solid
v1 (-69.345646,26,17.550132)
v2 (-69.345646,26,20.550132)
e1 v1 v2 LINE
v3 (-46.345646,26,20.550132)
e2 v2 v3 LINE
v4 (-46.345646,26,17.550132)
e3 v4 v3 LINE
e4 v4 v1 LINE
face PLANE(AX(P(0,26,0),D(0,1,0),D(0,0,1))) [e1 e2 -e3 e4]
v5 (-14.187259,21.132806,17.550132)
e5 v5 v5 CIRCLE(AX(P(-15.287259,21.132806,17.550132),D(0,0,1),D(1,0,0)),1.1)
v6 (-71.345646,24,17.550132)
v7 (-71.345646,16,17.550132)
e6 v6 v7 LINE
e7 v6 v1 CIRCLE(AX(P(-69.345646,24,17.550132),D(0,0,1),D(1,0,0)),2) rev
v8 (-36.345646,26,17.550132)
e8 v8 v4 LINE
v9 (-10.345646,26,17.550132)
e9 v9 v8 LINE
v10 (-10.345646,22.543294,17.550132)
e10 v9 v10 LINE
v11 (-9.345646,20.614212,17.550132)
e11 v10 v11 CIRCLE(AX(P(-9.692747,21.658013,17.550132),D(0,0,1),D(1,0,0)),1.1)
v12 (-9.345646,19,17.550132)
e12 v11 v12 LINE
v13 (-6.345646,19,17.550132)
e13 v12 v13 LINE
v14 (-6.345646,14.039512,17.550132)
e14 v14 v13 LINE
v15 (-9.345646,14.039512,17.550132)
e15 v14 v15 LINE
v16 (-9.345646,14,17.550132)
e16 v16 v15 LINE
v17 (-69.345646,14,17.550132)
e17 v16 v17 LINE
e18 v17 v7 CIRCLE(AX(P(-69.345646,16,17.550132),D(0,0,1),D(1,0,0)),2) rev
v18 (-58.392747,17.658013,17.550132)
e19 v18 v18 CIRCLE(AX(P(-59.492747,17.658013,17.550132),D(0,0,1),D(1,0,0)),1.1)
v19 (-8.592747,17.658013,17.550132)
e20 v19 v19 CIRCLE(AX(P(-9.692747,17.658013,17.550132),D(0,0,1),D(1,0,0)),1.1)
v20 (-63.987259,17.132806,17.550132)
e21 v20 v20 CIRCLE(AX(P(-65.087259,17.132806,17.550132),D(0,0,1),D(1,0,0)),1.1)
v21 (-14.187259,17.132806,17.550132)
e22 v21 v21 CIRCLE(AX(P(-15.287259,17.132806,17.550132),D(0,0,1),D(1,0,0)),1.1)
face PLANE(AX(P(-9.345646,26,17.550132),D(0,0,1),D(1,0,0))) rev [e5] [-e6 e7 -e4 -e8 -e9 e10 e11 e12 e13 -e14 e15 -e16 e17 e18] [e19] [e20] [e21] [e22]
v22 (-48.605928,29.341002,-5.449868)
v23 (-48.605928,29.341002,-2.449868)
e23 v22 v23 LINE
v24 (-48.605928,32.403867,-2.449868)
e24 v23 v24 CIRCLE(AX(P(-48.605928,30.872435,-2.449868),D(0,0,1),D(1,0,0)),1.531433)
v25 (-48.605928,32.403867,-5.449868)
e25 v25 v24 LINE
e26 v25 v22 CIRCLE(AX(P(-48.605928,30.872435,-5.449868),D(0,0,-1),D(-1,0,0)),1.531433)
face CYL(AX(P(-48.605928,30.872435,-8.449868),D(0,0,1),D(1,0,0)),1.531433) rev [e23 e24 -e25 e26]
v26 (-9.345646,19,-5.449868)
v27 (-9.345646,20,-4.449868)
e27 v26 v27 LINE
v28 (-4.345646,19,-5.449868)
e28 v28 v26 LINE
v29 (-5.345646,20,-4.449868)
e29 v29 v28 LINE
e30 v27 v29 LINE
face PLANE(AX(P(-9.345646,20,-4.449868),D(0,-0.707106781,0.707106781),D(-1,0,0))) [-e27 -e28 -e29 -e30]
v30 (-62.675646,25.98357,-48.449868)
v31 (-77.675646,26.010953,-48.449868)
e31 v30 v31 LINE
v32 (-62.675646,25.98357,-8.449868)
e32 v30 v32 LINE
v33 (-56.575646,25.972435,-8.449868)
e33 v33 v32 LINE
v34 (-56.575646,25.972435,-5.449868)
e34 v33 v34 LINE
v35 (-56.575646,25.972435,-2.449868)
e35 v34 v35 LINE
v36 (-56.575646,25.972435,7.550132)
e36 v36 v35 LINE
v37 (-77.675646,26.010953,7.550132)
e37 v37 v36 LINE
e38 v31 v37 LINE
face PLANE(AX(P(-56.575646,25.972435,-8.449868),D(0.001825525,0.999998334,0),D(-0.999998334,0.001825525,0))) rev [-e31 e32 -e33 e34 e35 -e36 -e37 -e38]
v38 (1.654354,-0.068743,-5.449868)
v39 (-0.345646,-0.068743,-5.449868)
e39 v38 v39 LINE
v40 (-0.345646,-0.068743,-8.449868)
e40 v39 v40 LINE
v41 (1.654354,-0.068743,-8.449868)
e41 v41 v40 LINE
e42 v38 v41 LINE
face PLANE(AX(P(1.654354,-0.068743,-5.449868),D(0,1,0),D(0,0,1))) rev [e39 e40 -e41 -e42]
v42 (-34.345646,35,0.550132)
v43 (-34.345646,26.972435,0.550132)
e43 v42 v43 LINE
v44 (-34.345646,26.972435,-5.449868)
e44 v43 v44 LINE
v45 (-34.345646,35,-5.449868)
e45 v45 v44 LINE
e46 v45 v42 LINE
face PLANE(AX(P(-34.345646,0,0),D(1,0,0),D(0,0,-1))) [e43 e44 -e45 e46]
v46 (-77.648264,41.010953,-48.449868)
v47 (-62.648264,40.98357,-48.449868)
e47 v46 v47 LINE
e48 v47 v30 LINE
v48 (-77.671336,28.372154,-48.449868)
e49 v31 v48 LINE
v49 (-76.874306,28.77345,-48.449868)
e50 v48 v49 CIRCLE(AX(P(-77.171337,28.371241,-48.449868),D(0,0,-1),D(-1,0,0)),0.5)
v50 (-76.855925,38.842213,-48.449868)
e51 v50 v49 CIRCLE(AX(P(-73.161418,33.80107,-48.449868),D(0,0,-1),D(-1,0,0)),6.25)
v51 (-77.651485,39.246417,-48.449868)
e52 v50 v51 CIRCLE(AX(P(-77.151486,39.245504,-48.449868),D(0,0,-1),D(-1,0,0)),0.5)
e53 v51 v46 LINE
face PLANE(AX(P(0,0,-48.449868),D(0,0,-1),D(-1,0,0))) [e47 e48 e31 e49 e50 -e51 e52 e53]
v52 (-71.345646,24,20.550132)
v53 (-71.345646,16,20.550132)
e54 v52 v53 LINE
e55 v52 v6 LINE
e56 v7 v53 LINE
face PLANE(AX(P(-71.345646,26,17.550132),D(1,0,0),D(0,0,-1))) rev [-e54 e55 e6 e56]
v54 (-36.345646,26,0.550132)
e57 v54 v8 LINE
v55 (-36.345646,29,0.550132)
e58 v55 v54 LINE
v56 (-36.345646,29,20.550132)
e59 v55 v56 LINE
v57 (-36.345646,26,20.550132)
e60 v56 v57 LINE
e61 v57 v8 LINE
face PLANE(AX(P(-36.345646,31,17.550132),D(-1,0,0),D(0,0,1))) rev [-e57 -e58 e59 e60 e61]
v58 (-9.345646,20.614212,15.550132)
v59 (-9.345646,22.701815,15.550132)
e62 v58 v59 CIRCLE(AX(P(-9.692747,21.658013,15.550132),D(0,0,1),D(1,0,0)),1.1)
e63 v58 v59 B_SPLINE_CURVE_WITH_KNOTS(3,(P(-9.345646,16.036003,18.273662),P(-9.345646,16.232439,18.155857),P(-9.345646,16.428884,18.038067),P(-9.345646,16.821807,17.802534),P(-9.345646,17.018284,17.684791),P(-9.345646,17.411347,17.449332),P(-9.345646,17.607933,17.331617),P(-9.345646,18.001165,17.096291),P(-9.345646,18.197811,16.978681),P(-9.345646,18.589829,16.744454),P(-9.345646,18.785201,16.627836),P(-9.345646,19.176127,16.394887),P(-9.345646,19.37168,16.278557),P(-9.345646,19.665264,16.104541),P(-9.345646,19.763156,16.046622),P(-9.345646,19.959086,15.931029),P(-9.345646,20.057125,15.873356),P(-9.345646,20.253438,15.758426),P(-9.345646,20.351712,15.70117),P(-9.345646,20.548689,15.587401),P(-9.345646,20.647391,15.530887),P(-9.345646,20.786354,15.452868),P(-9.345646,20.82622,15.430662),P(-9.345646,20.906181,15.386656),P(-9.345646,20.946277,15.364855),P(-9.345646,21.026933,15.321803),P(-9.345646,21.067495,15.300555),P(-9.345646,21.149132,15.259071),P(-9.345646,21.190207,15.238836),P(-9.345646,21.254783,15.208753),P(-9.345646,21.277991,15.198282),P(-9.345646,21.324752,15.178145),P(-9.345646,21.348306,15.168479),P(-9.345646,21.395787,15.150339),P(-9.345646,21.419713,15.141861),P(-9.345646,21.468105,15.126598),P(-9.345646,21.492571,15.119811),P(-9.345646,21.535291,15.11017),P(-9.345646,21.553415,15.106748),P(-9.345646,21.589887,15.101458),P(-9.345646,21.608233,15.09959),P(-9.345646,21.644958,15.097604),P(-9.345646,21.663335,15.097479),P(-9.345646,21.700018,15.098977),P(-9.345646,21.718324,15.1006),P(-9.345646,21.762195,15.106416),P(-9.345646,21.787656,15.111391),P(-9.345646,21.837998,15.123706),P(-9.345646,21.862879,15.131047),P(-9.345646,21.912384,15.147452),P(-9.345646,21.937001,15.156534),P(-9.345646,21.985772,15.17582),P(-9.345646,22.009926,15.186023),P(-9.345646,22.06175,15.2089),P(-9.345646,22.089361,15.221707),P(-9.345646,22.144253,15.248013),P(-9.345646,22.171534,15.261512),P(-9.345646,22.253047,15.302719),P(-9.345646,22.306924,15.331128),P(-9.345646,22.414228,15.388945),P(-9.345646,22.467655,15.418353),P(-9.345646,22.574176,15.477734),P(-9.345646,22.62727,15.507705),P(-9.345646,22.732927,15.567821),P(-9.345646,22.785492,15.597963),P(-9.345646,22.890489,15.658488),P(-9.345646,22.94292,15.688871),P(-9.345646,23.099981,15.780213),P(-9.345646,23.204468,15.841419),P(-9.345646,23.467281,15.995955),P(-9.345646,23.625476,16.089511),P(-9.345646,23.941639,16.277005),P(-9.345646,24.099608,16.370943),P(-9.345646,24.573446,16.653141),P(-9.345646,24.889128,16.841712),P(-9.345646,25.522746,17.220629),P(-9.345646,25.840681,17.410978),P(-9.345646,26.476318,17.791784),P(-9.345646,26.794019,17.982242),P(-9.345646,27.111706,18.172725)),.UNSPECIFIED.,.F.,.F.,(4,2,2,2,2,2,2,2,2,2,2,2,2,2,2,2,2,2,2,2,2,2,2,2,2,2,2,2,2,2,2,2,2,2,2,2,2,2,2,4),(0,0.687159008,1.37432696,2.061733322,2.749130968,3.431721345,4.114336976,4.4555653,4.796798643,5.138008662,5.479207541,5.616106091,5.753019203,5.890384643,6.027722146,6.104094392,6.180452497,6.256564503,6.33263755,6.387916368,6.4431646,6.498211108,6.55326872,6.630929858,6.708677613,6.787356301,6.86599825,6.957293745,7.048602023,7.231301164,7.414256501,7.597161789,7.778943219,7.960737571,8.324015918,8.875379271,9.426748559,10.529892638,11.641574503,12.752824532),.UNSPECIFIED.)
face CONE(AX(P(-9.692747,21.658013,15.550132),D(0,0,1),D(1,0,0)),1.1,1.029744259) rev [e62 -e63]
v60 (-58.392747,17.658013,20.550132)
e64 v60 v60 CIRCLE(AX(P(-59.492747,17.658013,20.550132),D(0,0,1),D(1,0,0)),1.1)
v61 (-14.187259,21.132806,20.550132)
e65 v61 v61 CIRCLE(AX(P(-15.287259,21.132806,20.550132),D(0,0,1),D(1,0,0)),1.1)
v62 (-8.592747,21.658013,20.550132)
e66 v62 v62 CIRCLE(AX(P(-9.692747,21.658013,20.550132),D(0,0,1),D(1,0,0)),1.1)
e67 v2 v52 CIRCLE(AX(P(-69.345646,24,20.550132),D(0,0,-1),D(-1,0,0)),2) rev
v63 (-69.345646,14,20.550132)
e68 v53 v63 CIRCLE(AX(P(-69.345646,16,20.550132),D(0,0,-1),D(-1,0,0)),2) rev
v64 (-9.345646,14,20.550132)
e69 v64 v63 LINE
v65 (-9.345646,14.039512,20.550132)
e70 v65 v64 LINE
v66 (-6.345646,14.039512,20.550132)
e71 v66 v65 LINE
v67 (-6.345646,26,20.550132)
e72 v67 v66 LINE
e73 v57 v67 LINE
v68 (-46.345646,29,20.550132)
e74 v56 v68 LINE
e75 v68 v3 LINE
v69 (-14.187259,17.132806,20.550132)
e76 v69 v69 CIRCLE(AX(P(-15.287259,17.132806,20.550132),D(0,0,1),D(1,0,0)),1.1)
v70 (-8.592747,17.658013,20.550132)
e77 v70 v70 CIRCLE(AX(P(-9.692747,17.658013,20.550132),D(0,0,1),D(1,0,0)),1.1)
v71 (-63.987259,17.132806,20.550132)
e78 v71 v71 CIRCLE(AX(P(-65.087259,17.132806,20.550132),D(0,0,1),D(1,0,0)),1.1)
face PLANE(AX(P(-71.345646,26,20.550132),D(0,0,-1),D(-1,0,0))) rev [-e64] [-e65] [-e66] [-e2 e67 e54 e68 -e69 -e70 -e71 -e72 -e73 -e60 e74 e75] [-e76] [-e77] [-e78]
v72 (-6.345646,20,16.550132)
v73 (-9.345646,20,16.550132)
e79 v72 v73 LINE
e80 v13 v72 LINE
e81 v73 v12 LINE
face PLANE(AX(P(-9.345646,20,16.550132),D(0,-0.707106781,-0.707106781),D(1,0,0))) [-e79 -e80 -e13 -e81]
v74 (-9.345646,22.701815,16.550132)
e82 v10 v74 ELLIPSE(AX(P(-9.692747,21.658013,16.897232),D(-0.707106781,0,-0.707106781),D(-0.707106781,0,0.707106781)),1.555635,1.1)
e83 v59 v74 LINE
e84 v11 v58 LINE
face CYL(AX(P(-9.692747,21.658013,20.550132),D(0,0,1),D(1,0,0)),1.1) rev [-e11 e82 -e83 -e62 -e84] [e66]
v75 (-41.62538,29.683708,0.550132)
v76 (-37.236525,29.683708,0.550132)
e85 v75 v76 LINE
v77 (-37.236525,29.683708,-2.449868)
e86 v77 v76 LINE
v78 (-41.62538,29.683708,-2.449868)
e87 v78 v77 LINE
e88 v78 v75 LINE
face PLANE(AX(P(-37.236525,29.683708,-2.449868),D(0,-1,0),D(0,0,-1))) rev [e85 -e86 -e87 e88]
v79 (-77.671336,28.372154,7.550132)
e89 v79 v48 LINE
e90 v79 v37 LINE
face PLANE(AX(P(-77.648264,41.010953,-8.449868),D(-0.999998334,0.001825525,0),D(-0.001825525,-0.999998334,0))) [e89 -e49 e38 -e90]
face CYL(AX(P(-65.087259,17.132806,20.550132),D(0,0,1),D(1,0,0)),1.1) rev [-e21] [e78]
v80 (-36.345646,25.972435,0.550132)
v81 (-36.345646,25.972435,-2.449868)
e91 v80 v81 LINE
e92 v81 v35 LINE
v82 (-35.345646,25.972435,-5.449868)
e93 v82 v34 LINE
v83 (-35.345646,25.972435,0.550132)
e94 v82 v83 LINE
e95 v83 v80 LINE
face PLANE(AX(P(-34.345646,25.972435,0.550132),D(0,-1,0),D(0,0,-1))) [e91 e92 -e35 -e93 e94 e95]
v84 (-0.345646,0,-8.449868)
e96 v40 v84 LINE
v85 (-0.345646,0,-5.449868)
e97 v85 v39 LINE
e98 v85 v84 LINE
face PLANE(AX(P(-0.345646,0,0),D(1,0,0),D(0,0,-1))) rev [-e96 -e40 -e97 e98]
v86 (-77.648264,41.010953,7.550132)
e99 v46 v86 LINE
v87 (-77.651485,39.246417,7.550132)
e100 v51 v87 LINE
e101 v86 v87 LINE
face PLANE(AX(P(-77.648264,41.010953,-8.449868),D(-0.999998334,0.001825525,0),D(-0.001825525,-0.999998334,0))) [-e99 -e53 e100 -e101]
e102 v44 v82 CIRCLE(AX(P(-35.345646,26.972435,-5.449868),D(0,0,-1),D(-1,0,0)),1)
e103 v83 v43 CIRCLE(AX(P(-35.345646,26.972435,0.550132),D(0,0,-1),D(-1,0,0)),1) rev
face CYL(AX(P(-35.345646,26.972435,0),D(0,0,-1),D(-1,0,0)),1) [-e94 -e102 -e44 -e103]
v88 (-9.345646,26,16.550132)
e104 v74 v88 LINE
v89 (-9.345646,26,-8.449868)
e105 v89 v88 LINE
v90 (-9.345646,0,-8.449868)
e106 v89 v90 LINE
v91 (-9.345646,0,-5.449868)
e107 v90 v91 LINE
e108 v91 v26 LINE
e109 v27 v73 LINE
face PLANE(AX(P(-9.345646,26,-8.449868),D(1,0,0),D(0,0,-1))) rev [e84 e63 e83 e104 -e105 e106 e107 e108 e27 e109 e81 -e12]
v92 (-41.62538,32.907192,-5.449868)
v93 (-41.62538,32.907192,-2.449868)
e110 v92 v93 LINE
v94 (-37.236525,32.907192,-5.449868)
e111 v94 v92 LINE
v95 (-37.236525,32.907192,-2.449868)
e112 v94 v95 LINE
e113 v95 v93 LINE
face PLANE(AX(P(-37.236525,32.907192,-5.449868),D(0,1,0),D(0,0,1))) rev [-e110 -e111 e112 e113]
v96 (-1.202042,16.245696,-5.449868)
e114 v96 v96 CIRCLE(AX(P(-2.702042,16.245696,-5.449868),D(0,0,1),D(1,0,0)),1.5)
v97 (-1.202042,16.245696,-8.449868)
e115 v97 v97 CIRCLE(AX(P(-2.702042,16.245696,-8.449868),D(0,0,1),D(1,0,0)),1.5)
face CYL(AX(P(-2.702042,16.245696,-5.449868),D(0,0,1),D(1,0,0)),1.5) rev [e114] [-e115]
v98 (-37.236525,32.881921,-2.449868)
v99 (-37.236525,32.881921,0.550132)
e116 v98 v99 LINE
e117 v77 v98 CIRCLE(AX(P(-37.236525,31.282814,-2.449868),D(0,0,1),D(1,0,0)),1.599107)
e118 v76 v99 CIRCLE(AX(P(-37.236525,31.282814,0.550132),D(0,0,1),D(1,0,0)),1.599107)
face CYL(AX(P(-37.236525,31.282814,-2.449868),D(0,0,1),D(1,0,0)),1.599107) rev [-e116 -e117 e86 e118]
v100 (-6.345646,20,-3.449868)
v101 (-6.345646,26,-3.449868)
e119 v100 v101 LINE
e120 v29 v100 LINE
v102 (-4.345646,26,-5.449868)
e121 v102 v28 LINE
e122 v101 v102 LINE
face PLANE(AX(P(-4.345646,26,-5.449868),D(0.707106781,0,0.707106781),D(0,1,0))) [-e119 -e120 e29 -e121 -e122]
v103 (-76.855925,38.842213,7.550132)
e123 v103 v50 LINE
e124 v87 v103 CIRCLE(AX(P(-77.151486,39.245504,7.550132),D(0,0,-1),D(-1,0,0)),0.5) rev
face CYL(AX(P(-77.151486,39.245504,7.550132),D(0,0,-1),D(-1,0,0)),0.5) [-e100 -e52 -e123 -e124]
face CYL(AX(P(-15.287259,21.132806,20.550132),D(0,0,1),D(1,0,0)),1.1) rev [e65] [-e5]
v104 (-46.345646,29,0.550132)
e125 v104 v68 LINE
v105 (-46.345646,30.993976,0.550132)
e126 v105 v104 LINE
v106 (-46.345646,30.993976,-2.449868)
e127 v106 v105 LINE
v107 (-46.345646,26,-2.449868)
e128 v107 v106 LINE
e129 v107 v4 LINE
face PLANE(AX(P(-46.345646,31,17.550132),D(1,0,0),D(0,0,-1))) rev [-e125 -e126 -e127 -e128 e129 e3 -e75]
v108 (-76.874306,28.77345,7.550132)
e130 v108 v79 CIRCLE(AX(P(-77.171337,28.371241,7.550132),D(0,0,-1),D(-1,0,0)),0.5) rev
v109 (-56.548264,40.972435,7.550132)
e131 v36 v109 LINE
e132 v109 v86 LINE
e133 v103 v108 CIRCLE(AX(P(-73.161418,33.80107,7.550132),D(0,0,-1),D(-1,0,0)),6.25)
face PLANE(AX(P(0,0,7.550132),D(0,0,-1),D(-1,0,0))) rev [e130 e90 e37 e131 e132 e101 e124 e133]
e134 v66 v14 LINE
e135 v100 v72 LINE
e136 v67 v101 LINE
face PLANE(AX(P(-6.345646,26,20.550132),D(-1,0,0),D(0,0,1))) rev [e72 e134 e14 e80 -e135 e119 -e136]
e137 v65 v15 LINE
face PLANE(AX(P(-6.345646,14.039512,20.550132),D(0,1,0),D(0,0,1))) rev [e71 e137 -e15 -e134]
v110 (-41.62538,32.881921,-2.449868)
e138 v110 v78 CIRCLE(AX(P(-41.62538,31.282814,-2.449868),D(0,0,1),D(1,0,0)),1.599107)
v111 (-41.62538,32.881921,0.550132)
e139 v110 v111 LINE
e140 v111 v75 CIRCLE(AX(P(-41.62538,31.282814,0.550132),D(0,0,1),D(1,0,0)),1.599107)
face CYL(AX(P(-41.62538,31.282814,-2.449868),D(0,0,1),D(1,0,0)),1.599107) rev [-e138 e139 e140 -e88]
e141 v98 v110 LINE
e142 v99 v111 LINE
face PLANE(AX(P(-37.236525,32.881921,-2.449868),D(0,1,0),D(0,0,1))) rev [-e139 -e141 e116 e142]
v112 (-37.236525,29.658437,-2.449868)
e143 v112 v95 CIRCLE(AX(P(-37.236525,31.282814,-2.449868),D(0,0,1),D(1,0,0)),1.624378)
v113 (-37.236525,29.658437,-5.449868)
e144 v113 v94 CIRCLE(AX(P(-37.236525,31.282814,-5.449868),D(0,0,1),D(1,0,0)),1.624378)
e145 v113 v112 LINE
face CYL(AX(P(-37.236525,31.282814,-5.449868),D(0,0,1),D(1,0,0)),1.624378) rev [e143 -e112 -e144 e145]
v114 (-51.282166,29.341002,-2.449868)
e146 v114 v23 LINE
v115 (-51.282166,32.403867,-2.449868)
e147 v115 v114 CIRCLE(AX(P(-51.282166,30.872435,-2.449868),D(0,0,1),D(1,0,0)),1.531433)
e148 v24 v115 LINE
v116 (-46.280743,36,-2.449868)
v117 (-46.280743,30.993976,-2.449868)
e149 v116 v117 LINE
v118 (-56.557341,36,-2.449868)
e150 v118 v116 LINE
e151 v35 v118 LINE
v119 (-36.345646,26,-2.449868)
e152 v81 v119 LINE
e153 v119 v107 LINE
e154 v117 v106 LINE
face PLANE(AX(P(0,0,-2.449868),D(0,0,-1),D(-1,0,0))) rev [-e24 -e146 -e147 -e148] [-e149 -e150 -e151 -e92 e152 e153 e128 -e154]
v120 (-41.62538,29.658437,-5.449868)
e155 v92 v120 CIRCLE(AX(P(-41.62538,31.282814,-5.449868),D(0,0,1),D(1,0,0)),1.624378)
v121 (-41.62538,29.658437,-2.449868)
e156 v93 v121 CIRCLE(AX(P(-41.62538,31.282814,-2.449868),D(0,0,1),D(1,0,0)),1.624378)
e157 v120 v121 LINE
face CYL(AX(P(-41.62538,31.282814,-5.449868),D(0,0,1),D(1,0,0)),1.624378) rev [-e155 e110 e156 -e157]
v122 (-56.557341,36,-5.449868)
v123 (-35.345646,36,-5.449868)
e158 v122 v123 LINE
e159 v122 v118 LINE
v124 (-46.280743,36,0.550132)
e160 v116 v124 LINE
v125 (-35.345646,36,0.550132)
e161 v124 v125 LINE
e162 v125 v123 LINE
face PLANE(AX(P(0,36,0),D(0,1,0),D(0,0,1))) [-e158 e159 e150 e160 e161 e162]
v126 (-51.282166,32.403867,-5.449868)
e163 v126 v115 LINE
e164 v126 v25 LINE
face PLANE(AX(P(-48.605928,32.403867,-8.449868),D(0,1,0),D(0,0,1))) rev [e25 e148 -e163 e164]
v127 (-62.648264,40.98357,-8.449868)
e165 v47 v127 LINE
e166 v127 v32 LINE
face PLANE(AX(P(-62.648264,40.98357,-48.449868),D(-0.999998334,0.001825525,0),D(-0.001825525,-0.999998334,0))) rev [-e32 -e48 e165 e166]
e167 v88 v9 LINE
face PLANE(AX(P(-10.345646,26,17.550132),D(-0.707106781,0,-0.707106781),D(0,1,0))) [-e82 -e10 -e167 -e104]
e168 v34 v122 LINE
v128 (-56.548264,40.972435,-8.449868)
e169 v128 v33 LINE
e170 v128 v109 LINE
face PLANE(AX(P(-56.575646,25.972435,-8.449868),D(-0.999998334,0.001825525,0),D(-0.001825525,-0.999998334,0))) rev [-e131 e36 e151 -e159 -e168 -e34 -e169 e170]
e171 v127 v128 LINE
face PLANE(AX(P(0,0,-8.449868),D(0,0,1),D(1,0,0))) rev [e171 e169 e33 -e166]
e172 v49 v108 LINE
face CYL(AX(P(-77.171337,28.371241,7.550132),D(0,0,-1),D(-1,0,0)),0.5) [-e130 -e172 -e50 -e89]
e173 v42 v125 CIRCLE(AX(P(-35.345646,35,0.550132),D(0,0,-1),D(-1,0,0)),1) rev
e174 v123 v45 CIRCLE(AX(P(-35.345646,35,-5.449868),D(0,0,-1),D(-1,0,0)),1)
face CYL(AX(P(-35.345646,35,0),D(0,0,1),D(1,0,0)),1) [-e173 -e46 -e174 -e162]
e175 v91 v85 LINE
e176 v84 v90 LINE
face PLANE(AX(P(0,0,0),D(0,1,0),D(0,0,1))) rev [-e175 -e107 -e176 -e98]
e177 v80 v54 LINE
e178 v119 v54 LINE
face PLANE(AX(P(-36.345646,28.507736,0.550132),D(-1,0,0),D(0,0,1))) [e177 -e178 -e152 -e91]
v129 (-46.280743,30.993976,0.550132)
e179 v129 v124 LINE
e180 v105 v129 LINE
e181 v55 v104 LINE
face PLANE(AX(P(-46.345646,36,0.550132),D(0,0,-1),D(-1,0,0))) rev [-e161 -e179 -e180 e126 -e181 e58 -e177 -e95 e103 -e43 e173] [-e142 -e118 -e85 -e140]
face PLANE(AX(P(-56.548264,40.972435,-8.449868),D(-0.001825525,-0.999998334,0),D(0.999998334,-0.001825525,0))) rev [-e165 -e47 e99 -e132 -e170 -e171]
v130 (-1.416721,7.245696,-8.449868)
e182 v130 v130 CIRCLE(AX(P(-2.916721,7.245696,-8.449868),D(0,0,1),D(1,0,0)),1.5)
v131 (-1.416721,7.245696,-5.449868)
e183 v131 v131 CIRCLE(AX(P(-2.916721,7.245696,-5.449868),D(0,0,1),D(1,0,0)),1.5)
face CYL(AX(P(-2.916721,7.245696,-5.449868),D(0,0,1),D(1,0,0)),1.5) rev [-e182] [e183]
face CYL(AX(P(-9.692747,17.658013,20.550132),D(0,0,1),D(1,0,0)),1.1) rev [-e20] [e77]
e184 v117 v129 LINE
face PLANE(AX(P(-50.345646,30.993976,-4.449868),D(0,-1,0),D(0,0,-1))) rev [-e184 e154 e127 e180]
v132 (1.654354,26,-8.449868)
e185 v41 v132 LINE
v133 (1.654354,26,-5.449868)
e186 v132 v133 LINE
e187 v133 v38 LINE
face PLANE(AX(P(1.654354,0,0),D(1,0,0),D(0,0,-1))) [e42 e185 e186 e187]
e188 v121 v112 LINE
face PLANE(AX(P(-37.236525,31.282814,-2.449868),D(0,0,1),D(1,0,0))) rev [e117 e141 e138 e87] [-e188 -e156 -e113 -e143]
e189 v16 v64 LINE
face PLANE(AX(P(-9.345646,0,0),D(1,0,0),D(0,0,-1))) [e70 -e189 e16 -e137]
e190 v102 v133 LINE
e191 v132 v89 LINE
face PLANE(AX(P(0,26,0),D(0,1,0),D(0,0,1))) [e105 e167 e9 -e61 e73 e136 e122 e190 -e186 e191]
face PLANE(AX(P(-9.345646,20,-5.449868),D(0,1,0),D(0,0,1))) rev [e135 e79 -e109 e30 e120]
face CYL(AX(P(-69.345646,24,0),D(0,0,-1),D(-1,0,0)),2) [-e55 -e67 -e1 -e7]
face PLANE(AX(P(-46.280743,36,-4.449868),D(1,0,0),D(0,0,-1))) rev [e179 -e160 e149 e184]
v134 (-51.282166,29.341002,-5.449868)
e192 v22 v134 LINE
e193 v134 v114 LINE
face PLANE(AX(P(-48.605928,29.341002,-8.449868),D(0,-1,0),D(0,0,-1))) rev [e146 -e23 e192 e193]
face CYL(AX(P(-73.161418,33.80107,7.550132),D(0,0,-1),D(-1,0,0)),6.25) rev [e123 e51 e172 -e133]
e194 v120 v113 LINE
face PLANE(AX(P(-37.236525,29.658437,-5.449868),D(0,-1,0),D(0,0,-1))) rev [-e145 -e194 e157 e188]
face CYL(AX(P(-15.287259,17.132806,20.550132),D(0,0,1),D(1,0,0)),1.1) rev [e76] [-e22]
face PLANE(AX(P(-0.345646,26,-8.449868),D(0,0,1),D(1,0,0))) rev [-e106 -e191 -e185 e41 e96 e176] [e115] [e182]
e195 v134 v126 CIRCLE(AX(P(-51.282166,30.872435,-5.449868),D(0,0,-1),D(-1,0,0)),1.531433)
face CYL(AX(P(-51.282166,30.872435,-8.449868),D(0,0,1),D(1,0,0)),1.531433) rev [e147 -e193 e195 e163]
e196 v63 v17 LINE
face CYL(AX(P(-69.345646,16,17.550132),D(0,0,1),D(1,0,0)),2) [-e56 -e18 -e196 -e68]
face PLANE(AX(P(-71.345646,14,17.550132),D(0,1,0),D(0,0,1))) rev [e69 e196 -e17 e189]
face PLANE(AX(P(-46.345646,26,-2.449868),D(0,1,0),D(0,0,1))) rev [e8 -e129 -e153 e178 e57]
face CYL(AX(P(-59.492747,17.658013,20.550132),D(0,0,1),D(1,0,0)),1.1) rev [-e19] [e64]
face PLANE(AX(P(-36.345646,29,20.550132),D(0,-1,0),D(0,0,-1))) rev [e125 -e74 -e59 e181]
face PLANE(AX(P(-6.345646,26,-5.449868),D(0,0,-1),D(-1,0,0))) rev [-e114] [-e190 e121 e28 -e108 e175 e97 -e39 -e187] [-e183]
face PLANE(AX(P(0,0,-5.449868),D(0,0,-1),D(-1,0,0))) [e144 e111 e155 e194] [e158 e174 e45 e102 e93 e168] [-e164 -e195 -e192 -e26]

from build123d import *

# Parameters (mm, degrees)
EXTRUDE_1_DEPTH                 = 26
HOLE_START                      = -8.449868074
HOLE_WIZARD_3_0_3_1_OUTLINE_R   = 1.5
HOLE_WIZARD_3_0_3_1_DEPTH       = 3
SKETCH_11_W                     = 26
SKETCH_11_H                     = 20
CUT_EXTRUDE_1_DEPTH             = 3
SKETCH_14_W                     = 62
SKETCH_14_H                     = 14
CUT_EXTRUDE_2_DEPTH             = 3
SKETCH_18_W                     = 3
SKETCH_18_H                     = 5.960488001
EXTRUDE_5_DEPTH                 = 3
HOLE_START_2                    = 17.550131926
HOLE_WIZARD_3_0_2_2_1_OUTLINE_R = 1.1
HOLE_WIZARD_3_0_2_2_1_DEPTH     = 3
HOLE_WIZARD_3_0_2_2_2_OUTLINE_R = 1.1
HOLE_WIZARD_3_0_2_2_2_DEPTH     = 3
HOLE_WIZARD_3_0_2_2_3_OUTLINE_R = 1.1
HOLE_WIZARD_3_0_2_2_3_DEPTH     = 3
HOLE_WIZARD_3_0_2_2_4_OUTLINE_R = 1.1
HOLE_WIZARD_3_0_2_2_4_DEPTH     = 3
CHAMFER_1_SIZE                  = 1
CHAMFER_2_SIZE                  = 2
CHAMFER_3_SIZE                  = 1
SKETCH_45_W                     = 3
SKETCH_45_H                     = 26.068743285
EXTRUDE_6_DEPTH                 = 2
CHAMFER_4_SIZE                  = 1
SKETCH_64_W                     = 5
SKETCH_64_H                     = 3
EXTRUDE_11_DEPTH                = 5
SKETCH_65_W                     = 5
SKETCH_65_H                     = 4.928929729
EXTRUDE_12_DEPTH                = 20
SKETCH_68_W                     = 5
SKETCH_68_H                     = 3
EXTRUDE_13_DEPTH                = 5
SKETCH_70_W                     = 3
SKETCH_70_H                     = 5.006023724
EXTRUDE_14_DEPTH                = 4
SKETCH_71_W                     = 3
SKETCH_71_H                     = 4.998374441
EXTRUDE_15_DEPTH                = 3
SKETCH_73_W                     = 20
SKETCH_73_H                     = 2.154918848
CUT_EXTRUDE_5_DEPTH             = 5
FILLET_1_R                      = 2
EXTRUDE_START                   = -3
SKETCH_80_R                     = 1.5
EXTRUDE_16_DEPTH                = 3
HOLE_WIZARD_3_0_3_2_OUTLINE_R   = 1.5
HOLE_WIZARD_3_0_3_2_DEPTH       = 3
SKETCH_88_W                     = 5
SKETCH_88_H                     = 3
EXTRUDE_20_DEPTH                = 5
SKETCH_89_W                     = 5
SKETCH_89_H                     = 2.54765363
EXTRUDE_21_DEPTH                = 20
SKETCH_92_W                     = 2.009733892
SKETCH_92_H                     = 3
EXTRUDE_22_DEPTH                = 5
SKETCH_93_W                     = 4.064903442
SKETCH_93_H                     = 5.006023724
CUT_EXTRUDE_6_DEPTH             = 5
SKETCH_94_W                     = 3
SKETCH_94_H                     = 7.492263756
EXTRUDE_23_DEPTH                = 2
EXTRUDE_24_DEPTH                = 20
SKETCH_101_W                    = 2
SKETCH_101_H                    = 2.53530172
EXTRUDE_25_DEPTH                = 3
SKETCH_102_W                    = 20
SKETCH_102_H                    = 2
CUT_EXTRUDE_8_DEPTH             = 10
CUT_EXTRUDE_9_DEPTH             = 3
SKETCH_112_W                    = 22.23
SKETCH_112_H                    = 10.027565476
EXTRUDE_26_DEPTH                = 3
CUT_EXTRUDE_10_DEPTH            = 3
HOLE_WIZARD_3_0_3_3_D           = 3
HOLE_WIZARD_3_0_3_3_DEPTH       = 5
HOLE_WIZARD_3_0_3_3_TIP         = 0.901290929
EXTRUDE_27_DEPTH                = 3
FILLET_2_R                      = 1
CUT_EXTRUDE_13_DEPTH            = 6
EXTRUDE_28_DEPTH                = 6
EXTRUDE_29_DEPTH                = 40
EXTRUDE_30_DEPTH                = 10
SKETCH_126_R                    = 6.25
CUT_EXTRUDE_14_DEPTH            = 56
FILLET_3_R                      = 0.5
FILLET_4_R                      = 0.5


# Read off the part's stored shape, not the designer's step: Ø3.0 (3) 直径孔1, Ø3.0 (2.2) 直径孔1, Ø3.0 (2.2) 直径孔2, Ø3.0 (2.2) 直径孔3, Ø3.0 (2.2) 直径孔4, Ø3.0 (3) 直径孔2
with BuildPart() as part:
    # 草图4 → 凸台-拉伸1 (new body)
    with BuildSketch(Plane(origin=(0, 0, 0), x_dir=(1, 0, 0), z_dir=(0, 1, 0))):
        Polygon((-71.345646438, -20.550131926), (-6.345646438, -20.550131926), (-6.345646438, 5.449868074), (-0.345646438, 5.449868074), (-0.345646438, 8.449868074), (-9.345646438, 8.449868074), (-9.345646438, -17.550131926), (-71.345646438, -17.550131926), align=None)
    extrude(amount=EXTRUDE_1_DEPTH)

    # Ø3.0 (3) 直径孔1 outline → Ø3.0 (3) 直径孔1 (cut)
    with BuildSketch(Plane.XY.offset(HOLE_START)):
        with Locations((-2.70204226, 8.045696334)):
            Circle(HOLE_WIZARD_3_0_3_1_OUTLINE_R)
        with Locations((-2.70204226, 16.245696334)):
            Circle(HOLE_WIZARD_3_0_3_1_OUTLINE_R)
    extrude(amount=HOLE_WIZARD_3_0_3_1_DEPTH, mode=Mode.SUBTRACT)

    # 草图11 → 切除-拉伸1 (cut)
    with BuildSketch(Plane(origin=(-6.345646438, 0, 0), x_dir=(0, 0, -1), z_dir=(1, 0, 0))):
        with Locations((-7.550131926, 10)):
            Rectangle(SKETCH_11_W, SKETCH_11_H)
    extrude(amount=-CUT_EXTRUDE_1_DEPTH, mode=Mode.SUBTRACT)

    # 草图14 → 切除-拉伸2 (cut)
    with BuildSketch(Plane.XY.offset(20.550131926)):
        with Locations((-40.345646438, 7)):
            Rectangle(SKETCH_14_W, SKETCH_14_H)
    extrude(amount=-CUT_EXTRUDE_2_DEPTH, mode=Mode.SUBTRACT)

    # 草图18 → 凸台-拉伸5 (add)
    with BuildSketch(Plane(origin=(-9.345646438, 0, 0), x_dir=(0, 0, -1), z_dir=(1, 0, 0))):
        with Locations((-19.050131926, 17.019755999)):
            Rectangle(SKETCH_18_W, SKETCH_18_H)
    extrude(amount=EXTRUDE_5_DEPTH)

    # Ø3.0 (2.2) 直径孔1 outline → Ø3.0 (2.2) 直径孔1 (cut)
    with BuildSketch(Plane.XY.offset(HOLE_START_2)):
        with Locations((-9.692746544, 17.658013179)):
            Circle(HOLE_WIZARD_3_0_2_2_1_OUTLINE_R)
    extrude(amount=HOLE_WIZARD_3_0_2_2_1_DEPTH, mode=Mode.SUBTRACT)

    # Hole Wizard 3.0 _2.2_ _1 2 outline → Hole Wizard 3.0 _2.2_ _1 2 (revolve, cut)
    with BuildSketch(Plane(origin=(-9.692746544, 21.658013179, 0), x_dir=(1, 0, 0), z_dir=(0, -1, 0))):
        Polygon((0.346891917, 15.097618937), (1.100000001, 15.550131926), (1.1, 20.550131926), (0, 20.550131926), (0, 15.097618937), align=None)
    revolve(axis=Axis((-9.692746544, 21.658013179, 0), (0, 0, 1)), mode=Mode.SUBTRACT)

    # Ø3.0 (2.2) 直径孔2 outline → Ø3.0 (2.2) 直径孔2 (cut)
    with BuildSketch(Plane.XY.offset(HOLE_START_2)):
        with Locations((-59.492746544, 17.658013179)):
            Circle(HOLE_WIZARD_3_0_2_2_2_OUTLINE_R)
    extrude(amount=HOLE_WIZARD_3_0_2_2_2_DEPTH, mode=Mode.SUBTRACT)

    # Ø3.0 (2.2) 直径孔3 outline → Ø3.0 (2.2) 直径孔3 (cut)
    with BuildSketch(Plane.XY.offset(HOLE_START_2)):
        with Locations((-15.287259423, 17.132806202)):
            Circle(HOLE_WIZARD_3_0_2_2_3_OUTLINE_R)
        with Locations((-15.287259423, 21.132806202)):
            Circle(HOLE_WIZARD_3_0_2_2_3_OUTLINE_R)
    extrude(amount=HOLE_WIZARD_3_0_2_2_3_DEPTH, mode=Mode.SUBTRACT)

    # Ø3.0 (2.2) 直径孔4 outline → Ø3.0 (2.2) 直径孔4 (cut)
    with BuildSketch(Plane.XY.offset(HOLE_START_2)):
        with Locations((-65.087259423, 17.132806202)):
            Circle(HOLE_WIZARD_3_0_2_2_4_OUTLINE_R)
    extrude(amount=HOLE_WIZARD_3_0_2_2_4_DEPTH, mode=Mode.SUBTRACT)

    # 倒角1
    chamfer_1_edges = [part.edges().sort_by_distance(p)[0] for p in [
        (-9.345646438, 24.350907327, 17.550131926),
    ]]
    chamfer(chamfer_1_edges, length=CHAMFER_1_SIZE)

    # 倒角2
    chamfer_2_edges = [part.edges().sort_by_distance(p)[0] for p in [
        (-6.345646438, 23, -5.449868074),
    ]]
    chamfer(chamfer_2_edges, length=CHAMFER_2_SIZE)

    # 倒角3
    chamfer_3_edges = [part.edges().sort_by_distance(p)[0] for p in [
        (-7.845646438, 20, 17.550131926),
    ]]
    chamfer(chamfer_3_edges, length=CHAMFER_3_SIZE)

    # 草图45 → 凸台-拉伸6 (add)
    with BuildSketch(Plane(origin=(-0.345646438, 0, 0), x_dir=(0, 0, -1), z_dir=(1, 0, 0))):
        with Locations((6.949868074, 12.965628357)):
            Rectangle(SKETCH_45_W, SKETCH_45_H)
    extrude(amount=EXTRUDE_6_DEPTH)

    # 倒角4
    chamfer_4_edges = [part.edges().sort_by_distance(p)[0] for p in [
        (-6.845646438, 20, -5.449868074),
    ]]
    chamfer(chamfer_4_edges, length=CHAMFER_4_SIZE)

    # 草图64 → 凸台-拉伸11 (add)
    with BuildSketch(Plane(origin=(0, 26, 0), x_dir=(1, 0, 0), z_dir=(0, 1, 0))):
        with Locations((-43.845646438, -19.050131926)):
            Rectangle(SKETCH_64_W, SKETCH_64_H)
    extrude(amount=EXTRUDE_11_DEPTH)

    # 草图65 → 凸台-拉伸12 (add)
    with BuildSketch(Plane(origin=(0, 0, 17.550131926), x_dir=(-1, 0, 0), z_dir=(0, 0, -1))):
        with Locations((43.845646438, 28.535535136)):
            Rectangle(SKETCH_65_W, SKETCH_65_H)
    extrude(amount=EXTRUDE_12_DEPTH)

    # 草图68 → 凸台-拉伸13 (add)
    with BuildSketch(Plane(origin=(0, 31, 0), x_dir=(1, 0, 0), z_dir=(0, 1, 0))):
        with Locations((-43.845646438, 0.949868074)):
            Rectangle(SKETCH_68_W, SKETCH_68_H)
    extrude(amount=EXTRUDE_13_DEPTH)

    # 草图70 → 凸台-拉伸14 (add)
    with BuildSketch(Plane.ZY.offset(46.345646438)):
        with Locations((-0.949868074, 33.496988138)):
            Rectangle(SKETCH_70_W, SKETCH_70_H)
    extrude(amount=EXTRUDE_14_DEPTH)

    # 草图71 → 凸台-拉伸15 (add)
    with BuildSketch(Plane(origin=(-41.345646438, 0, 0), x_dir=(0, 0, -1), z_dir=(1, 0, 0))):
        with Locations((0.949868074, 33.50081278)):
            Rectangle(SKETCH_71_W, SKETCH_71_H)
    extrude(amount=EXTRUDE_15_DEPTH)

    # 草图73 → 切除-拉伸5 (cut)
    with BuildSketch(Plane.ZY.offset(46.345646438)):
        with Locations((7.550131926, 27.148529695)):
            Rectangle(SKETCH_73_W, SKETCH_73_H)
    extrude(amount=-CUT_EXTRUDE_5_DEPTH, mode=Mode.SUBTRACT)

    # 圆角1
    fillet_1_edges = [part.edges().sort_by_distance(p)[0] for p in [
        (-71.345646438, 26, 19.050131926),
        (-71.345646438, 14, 19.050131926),
    ]]
    fillet(fillet_1_edges, radius=FILLET_1_R)

    # 草图80 → 凸台-拉伸16 (add)
    with BuildSketch(Plane.XY.offset(-5.449868074).offset(EXTRUDE_START)):
        with Locations((-2.70204226, 8.045696334)):
            Circle(SKETCH_80_R)
    extrude(amount=EXTRUDE_16_DEPTH)

    # Ø3.0 (3) 直径孔2 outline → Ø3.0 (3) 直径孔2 (cut)
    with BuildSketch(Plane.XY.offset(HOLE_START)):
        with Locations((-2.916721347, 7.245696334)):
            Circle(HOLE_WIZARD_3_0_3_2_OUTLINE_R)
    extrude(amount=HOLE_WIZARD_3_0_3_2_DEPTH, mode=Mode.SUBTRACT)

    # 草图88 → 凸台-拉伸20 (add)
    with BuildSketch(Plane(origin=(0, 26, 0), x_dir=(1, 0, 0), z_dir=(0, 1, 0))):
        with Locations((-38.845646438, -19.050131926)):
            Rectangle(SKETCH_88_W, SKETCH_88_H)
    extrude(amount=EXTRUDE_20_DEPTH)

    # 草图89 → 凸台-拉伸21 (add)
    with BuildSketch(Plane(origin=(0, 0, 17.550131926), x_dir=(-1, 0, 0), z_dir=(0, 0, -1))):
        with Locations((38.845646438, 29.726173185)):
            Rectangle(SKETCH_89_W, SKETCH_89_H)
    extrude(amount=EXTRUDE_21_DEPTH)

    # 草图92 → 凸台-拉伸22 (add)
    with BuildSketch(Plane(origin=(0, 31, 0), x_dir=(1, 0, 0), z_dir=(0, 1, 0))):
        with Locations((-37.350513384, 0.949868074)):
            Rectangle(SKETCH_92_W, SKETCH_92_H)
    extrude(amount=EXTRUDE_22_DEPTH)

    # 草图93 → 切除-拉伸6 (cut)
    with BuildSketch(Plane.XY.offset(0.550131926)):
        with Locations((-48.313194717, 33.496988138)):
            Rectangle(SKETCH_93_W, SKETCH_93_H)
    extrude(amount=-CUT_EXTRUDE_6_DEPTH, mode=Mode.SUBTRACT)

    # 草图94 → 凸台-拉伸23 (add)
    with BuildSketch(Plane(origin=(-36.345646438, 0, 0), x_dir=(0, 0, -1), z_dir=(1, 0, 0))):
        with Locations((0.949868074, 32.253868122)):
            Rectangle(SKETCH_94_W, SKETCH_94_H)
    extrude(amount=EXTRUDE_23_DEPTH)

    # 草图100 → 凸台-拉伸24 (add)
    with BuildSketch(Plane(origin=(0, 0, 17.550131926), x_dir=(-1, 0, 0), z_dir=(0, 0, -1))):
        Polygon((36.345646438, 28.45234637), (41.345646438, 28.45234637), (41.345646438, 28.225989119), (46.345646438, 28.225989119), (46.345646438, 26), (36.345646438, 26), align=None)
    extrude(amount=EXTRUDE_24_DEPTH)

    # 草图101 → 凸台-拉伸25 (add)
    with BuildSketch(Plane(origin=(0, 0, -2.449868074), x_dir=(-1, 0, 0), z_dir=(0, 0, -1))):
        with Locations((35.345646438, 27.240085384)):
            Rectangle(SKETCH_101_W, SKETCH_101_H)
    extrude(amount=-EXTRUDE_25_DEPTH)

    # 草图102 → 切除-拉伸8 (cut)
    with BuildSketch(Plane.ZY.offset(46.345646438)):
        with Locations((10.550131926, 30)):
            Rectangle(SKETCH_102_W, SKETCH_102_H)
    extrude(amount=-CUT_EXTRUDE_8_DEPTH, mode=Mode.SUBTRACT)

    # 草图109 → 切除-拉伸9 (cut)
    with BuildSketch(Plane.XY.offset(0.550131926)):
        with BuildLine():
            Line((-37.236525371, 29.683707729), (-41.625380126, 29.683707729))
            ThreePointArc((-41.625380126, 29.683707729), (-43.224486744, 31.282814348), (-41.625380126, 32.881920967))
            Line((-41.625380126, 32.881920967), (-37.236525371, 32.881920967))
            ThreePointArc((-37.236525371, 32.881920967), (-35.637418752, 31.282814348), (-37.236525371, 29.683707729))
        make_face()
    extrude(amount=-CUT_EXTRUDE_9_DEPTH, mode=Mode.SUBTRACT)

    # 草图112 → 凸台-拉伸26 (add)
    with BuildSketch(Plane(origin=(0, 0, -2.449868074), x_dir=(-1, 0, 0), z_dir=(0, 0, -1))):
        with Locations((45.460646438, 30.986217262)):
            Rectangle(SKETCH_112_W, SKETCH_112_H)
    extrude(amount=EXTRUDE_26_DEPTH)

    # 草图113 → 切除-拉伸10 (cut)
    with BuildSketch(Plane.XY.offset(-2.449868074)):
        with BuildLine():
            Line((-37.236525371, 29.658436642), (-41.625380126, 29.658436642))
            ThreePointArc((-41.625380126, 29.658436642), (-43.249757832, 31.282814348), (-41.625380126, 32.907192054))
            Line((-41.625380126, 32.907192054), (-37.236525371, 32.907192054))
            ThreePointArc((-37.236525371, 32.907192054), (-35.612147664, 31.282814348), (-37.236525371, 29.658436642))
        make_face()
    extrude(amount=-CUT_EXTRUDE_10_DEPTH, mode=Mode.SUBTRACT)

    # Ø3.0 (3) 直径孔3
    with Locations(Plane(origin=(0, 0, -5.449868074), x_dir=(-1, 0, 0), z_dir=(0, 0, -1))):
        with Locations((49.466328148, 30.872434524)):
            Hole(HOLE_WIZARD_3_0_3_3_D / 2, depth=HOLE_WIZARD_3_0_3_3_DEPTH)
            with Locations((0, 0, -(HOLE_WIZARD_3_0_3_3_DEPTH + HOLE_WIZARD_3_0_3_3_TIP / 2))):  # 118° drill point
                Cone(0, HOLE_WIZARD_3_0_3_3_D / 2, HOLE_WIZARD_3_0_3_3_TIP, mode=Mode.SUBTRACT)

    # 草图117 → 凸台-拉伸27 (add, symmetric)
    with BuildSketch(Plane(origin=(0, 0, -5.449868074), x_dir=(-1, 0, 0), z_dir=(0, 0, -1))):
        Polygon((56.575646438, 25.972434524), (71.675646438, 26), (71.648263514, 41), (56.548263514, 40.972434524), align=None)
    extrude(amount=EXTRUDE_27_DEPTH, both=True)

    # 圆角2
    fillet_2_edges = [part.edges().sort_by_distance(p)[0] for p in [
        (-34.345646438, 36, -2.449868074),
        (-34.345646438, 25.972434524, -2.449868074),
    ]]
    fillet(fillet_2_edges, radius=FILLET_2_R)

    # 草图120 → 切除-拉伸13 (cut)
    with BuildSketch(Plane.XY.offset(-2.449868074)):
        with BuildLine():
            Line((-48.605927595, 29.341001888), (-51.282166157, 29.341001888))
            ThreePointArc((-51.282166157, 29.341001888), (-52.813598792, 30.872434524), (-51.282166157, 32.403867159))
            Line((-51.282166157, 32.403867159), (-48.605927595, 32.403867159))
            ThreePointArc((-48.605927595, 32.403867159), (-47.074494959, 30.872434524), (-48.605927595, 29.341001888))
        make_face()
    extrude(amount=-CUT_EXTRUDE_13_DEPTH, mode=Mode.SUBTRACT)

    # 草图122 → 凸台-拉伸28 (add)
    with BuildSketch(Plane.XY.offset(-2.449868074)):
        Polygon((-71.648263514, 41), (-71.675646438, 26), (-77.675646438, 26.010953169), (-77.648263514, 41.010953169), align=None)
    extrude(amount=-EXTRUDE_28_DEPTH)

    # 草图123 → 凸台-拉伸29 (add)
    with BuildSketch(Plane(origin=(0, 0, -8.449868074), x_dir=(-1, 0, 0), z_dir=(0, 0, -1))):
        Polygon((77.648263514, 41.010953169), (77.675646438, 26.010953169), (62.675646438, 25.983570246), (62.648263514, 40.983570246), align=None)
    extrude(amount=EXTRUDE_29_DEPTH)

    # 草图125 → 凸台-拉伸30 (add)
    with BuildSketch(Plane.XY.offset(-2.449868074)):
        Polygon((-77.648263514, 41.010953169), (-77.675646438, 26.010953169), (-56.575646438, 25.972434524), (-56.548263514, 40.972434524), align=None)
    extrude(amount=EXTRUDE_30_DEPTH)

    # 草图126 → 切除-拉伸14 (cut)
    with BuildSketch(Plane(origin=(0, 0, -48.449868074), x_dir=(-1, 0, 0), z_dir=(0, 0, -1))):
        with Locations((73.161417861, 33.801070433)):
            Circle(SKETCH_126_R)
    extrude(amount=-CUT_EXTRUDE_14_DEPTH, mode=Mode.SUBTRACT)

    # 圆角3
    fillet_3_edges = [part.edges().sort_by_distance(p)[0] for p in [
        (-77.653492443, 38.146615963, -20.449868074),
    ]]
    fillet(fillet_3_edges, radius=FILLET_3_R)

    # 圆角4
    fillet_4_edges = [part.edges().sort_by_distance(p)[0] for p in [
        (-77.669328282, 29.471954631, -20.449868074),
    ]]
    fillet(fillet_4_edges, radius=FILLET_4_R)


solid = part.part
